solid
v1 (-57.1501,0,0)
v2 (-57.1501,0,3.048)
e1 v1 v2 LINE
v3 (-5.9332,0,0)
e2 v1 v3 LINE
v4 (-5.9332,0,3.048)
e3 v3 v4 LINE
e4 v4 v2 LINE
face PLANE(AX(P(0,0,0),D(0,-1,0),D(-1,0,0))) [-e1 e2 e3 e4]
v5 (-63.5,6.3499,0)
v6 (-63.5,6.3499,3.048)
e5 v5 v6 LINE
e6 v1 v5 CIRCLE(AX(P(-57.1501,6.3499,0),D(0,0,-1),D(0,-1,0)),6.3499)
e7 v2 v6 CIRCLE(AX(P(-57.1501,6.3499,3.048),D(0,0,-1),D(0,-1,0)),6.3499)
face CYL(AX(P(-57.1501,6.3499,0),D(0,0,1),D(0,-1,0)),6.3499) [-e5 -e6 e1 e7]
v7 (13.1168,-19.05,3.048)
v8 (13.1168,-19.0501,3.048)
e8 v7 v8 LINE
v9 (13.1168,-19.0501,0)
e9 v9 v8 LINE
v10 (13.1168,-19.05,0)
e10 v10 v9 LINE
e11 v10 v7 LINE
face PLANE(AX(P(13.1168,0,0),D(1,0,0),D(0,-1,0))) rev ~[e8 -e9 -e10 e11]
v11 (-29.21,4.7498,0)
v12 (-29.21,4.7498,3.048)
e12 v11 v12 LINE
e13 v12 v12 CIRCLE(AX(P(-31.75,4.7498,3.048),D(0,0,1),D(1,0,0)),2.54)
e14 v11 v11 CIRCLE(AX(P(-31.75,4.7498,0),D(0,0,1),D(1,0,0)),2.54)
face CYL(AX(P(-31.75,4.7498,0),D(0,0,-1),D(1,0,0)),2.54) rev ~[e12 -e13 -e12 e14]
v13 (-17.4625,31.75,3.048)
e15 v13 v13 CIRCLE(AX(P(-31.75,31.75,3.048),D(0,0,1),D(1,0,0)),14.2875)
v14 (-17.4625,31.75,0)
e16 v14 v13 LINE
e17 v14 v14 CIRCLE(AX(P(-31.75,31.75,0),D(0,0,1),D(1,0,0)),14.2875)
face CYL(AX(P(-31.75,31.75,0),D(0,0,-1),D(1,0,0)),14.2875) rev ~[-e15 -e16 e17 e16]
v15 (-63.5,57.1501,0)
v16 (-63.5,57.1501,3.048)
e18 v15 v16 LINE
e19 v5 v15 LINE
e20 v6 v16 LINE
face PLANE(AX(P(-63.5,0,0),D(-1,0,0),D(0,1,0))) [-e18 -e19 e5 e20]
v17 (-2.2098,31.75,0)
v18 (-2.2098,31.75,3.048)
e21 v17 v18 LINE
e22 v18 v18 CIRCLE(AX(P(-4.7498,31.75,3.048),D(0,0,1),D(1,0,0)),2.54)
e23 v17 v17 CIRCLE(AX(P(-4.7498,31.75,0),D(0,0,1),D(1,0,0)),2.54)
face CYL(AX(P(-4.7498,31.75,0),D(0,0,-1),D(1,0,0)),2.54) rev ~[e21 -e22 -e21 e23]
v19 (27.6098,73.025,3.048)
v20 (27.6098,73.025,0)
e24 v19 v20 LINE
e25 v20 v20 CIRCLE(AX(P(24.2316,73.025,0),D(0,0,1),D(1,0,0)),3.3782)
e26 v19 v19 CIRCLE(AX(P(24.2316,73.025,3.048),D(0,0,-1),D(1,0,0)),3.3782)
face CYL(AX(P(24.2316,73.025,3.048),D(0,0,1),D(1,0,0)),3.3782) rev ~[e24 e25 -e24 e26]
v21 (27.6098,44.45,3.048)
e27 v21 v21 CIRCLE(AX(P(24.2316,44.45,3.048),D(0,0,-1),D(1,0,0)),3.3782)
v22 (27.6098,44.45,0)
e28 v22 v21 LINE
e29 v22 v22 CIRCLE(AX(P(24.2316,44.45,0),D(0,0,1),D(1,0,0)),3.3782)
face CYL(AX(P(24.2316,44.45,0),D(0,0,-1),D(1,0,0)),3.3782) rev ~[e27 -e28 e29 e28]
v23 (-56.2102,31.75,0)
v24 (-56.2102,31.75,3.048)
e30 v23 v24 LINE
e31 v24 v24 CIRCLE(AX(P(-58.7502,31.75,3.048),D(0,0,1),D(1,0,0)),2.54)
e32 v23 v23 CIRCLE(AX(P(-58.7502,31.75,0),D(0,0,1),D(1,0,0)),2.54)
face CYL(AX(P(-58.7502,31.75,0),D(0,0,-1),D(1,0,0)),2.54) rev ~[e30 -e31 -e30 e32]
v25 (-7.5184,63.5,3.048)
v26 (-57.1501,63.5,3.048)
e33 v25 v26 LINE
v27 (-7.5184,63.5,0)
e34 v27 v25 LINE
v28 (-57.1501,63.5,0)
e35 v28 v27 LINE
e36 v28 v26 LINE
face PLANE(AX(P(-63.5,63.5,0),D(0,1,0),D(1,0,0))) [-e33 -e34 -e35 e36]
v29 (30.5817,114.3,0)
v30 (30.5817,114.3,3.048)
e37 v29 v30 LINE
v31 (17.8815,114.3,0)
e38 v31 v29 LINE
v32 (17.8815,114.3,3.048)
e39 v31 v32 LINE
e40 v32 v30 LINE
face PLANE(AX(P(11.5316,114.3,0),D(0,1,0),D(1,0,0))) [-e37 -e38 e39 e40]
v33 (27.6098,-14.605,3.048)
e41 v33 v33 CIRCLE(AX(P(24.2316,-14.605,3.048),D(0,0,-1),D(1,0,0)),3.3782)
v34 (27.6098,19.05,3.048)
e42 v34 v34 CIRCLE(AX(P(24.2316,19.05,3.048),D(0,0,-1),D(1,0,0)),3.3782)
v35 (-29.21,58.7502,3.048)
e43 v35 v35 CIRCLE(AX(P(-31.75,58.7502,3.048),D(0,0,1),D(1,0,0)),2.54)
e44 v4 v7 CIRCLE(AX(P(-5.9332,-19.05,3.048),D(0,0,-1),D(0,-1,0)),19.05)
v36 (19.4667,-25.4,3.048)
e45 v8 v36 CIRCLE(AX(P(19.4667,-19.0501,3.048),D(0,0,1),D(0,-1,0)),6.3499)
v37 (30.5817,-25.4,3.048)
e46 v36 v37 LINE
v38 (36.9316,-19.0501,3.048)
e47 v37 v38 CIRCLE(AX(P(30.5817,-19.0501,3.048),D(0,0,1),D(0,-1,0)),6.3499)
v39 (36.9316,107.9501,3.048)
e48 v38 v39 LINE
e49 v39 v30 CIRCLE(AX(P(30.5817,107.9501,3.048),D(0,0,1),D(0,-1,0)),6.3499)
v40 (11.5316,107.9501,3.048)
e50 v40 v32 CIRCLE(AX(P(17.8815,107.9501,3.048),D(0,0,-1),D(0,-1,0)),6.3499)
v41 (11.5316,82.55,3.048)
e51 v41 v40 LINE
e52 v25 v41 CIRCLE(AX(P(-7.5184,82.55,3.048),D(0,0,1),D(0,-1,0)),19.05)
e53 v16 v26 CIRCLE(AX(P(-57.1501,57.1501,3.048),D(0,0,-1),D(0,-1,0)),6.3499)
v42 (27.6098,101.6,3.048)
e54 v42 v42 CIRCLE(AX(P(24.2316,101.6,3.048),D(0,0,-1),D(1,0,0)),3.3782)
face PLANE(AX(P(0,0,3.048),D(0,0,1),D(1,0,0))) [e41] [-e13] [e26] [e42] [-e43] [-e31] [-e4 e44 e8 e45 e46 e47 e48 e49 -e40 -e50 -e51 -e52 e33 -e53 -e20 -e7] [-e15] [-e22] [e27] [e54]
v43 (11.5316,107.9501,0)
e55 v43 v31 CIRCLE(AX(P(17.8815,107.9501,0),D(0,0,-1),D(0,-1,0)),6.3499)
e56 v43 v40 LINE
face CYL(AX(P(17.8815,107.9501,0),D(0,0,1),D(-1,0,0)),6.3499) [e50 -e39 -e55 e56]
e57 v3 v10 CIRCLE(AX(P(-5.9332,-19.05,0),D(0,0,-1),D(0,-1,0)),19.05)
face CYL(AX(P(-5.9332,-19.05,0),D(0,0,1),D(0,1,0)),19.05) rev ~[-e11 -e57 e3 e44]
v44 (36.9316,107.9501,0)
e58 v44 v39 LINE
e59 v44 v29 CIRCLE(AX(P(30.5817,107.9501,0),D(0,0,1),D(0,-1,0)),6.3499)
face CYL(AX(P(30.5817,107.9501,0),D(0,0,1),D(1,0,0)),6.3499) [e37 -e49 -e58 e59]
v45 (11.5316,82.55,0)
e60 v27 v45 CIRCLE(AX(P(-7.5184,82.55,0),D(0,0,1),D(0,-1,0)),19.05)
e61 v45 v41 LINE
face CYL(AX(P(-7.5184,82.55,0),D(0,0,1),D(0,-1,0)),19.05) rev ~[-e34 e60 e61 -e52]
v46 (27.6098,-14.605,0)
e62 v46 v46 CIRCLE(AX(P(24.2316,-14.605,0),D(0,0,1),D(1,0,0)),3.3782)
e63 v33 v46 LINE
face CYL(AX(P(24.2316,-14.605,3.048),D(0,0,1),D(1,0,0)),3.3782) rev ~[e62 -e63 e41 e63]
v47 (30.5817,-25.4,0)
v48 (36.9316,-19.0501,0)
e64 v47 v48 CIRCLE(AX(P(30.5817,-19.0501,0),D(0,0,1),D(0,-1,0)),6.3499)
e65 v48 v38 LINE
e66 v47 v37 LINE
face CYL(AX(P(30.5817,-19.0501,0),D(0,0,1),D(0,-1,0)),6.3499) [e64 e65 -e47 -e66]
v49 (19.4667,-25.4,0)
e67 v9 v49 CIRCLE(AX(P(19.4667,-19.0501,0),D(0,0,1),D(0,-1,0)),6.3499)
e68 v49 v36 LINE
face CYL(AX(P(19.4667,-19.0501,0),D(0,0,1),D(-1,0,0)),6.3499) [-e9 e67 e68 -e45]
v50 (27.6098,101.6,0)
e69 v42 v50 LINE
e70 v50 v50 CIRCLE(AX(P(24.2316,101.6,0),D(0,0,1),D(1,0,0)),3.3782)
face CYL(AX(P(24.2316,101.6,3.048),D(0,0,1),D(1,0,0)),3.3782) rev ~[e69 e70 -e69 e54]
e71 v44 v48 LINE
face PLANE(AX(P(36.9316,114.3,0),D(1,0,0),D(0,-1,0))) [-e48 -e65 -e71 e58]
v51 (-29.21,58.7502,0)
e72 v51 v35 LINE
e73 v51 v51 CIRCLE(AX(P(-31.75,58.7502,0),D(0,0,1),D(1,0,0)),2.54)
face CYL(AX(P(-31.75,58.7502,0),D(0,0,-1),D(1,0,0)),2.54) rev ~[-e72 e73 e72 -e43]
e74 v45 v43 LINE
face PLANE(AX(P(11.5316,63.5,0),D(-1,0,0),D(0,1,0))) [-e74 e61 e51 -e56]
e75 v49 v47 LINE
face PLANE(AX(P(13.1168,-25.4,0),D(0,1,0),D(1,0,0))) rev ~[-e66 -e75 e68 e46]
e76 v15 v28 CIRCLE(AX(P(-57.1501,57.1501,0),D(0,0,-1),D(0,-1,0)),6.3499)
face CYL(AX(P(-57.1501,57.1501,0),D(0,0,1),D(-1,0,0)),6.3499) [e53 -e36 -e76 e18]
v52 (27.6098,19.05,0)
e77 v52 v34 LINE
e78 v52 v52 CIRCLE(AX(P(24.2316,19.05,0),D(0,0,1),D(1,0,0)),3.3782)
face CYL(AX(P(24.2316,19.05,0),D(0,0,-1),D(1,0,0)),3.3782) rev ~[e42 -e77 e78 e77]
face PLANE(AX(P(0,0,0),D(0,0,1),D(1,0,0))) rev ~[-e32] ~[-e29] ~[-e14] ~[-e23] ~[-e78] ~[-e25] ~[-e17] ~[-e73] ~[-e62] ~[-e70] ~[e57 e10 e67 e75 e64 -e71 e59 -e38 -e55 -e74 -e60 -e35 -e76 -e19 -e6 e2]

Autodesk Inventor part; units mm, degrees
ref_plane "YZ Plane" through (0, 0, 0) normal (1, 0, 0) x (0, 1, 0)
ref_plane "XZ Plane" through (0, 0, 0) normal (0, 1, 0) x (-1, 0, 0)
ref_plane "XY Plane" through (0, 0, 0) normal (0, 0, 1) x (1, 0, 0)
sketch "Sketch1" plane through (0, 0, 0) normal (0, 0, 1) x (1, 0, 0)
  line L0 (0, 0) -> (-63.5, 0)
  line L1 (-63.5, 0) -> (-63.5, 63.5)
  line L2 (-63.5, 63.5) -> (0, 63.5)
  circle A0 centre (-58.7502, 31.75) radius 2.54
  circle A1 centre (-31.75, 58.7502) radius 2.54
  circle A2 centre (-4.7498, 31.75) radius 2.54
  circle A3 centre (-31.75, 4.7498) radius 2.54
  line L3 (36.9316, 63.5) -> (36.9316, 0)
  line L4 (13.1168, 0) -> (0, 0)
  circle A4 centre (-31.75, 31.75) radius 14.2875
  line L5 (24.2316, 63.5) -> (24.2316, 44.45)
  line L6 (24.2316, 44.45) -> (24.2316, 19.05)
  circle A5 centre (24.2316, 44.45) radius 3.3782
  circle A6 centre (24.2316, 19.05) radius 3.3782
  line L7 (20.8534, 44.45) -> (20.8534, 19.05)
  line L8 (27.6098, 19.05) -> (27.6098, 44.45)
  line L9 (11.5316, 63.5) -> (11.5316, 114.3)
  line L10 (13.1168, 0) -> (13.1168, -25.4)
  line L11 (13.1168, -25.4) -> (36.9316, -25.4)
  line L12 (36.9316, -25.4) -> (36.9316, 0)
  line L13 (11.5316, 114.3) -> (36.9316, 114.3)
  line L14 (36.9316, 114.3) -> (36.9316, 63.5)
  line L15 (0, 63.5) -> (11.5316, 63.5)
  dimension "d0" = 63.5
  dimension "d1" = 63.5
  dimension "d6" = 5.08
  dimension "d7" = 5.08
  dimension "d8" = 5.08
  dimension "d9" = 5.08
  dimension "d11" = 36.9316
  dimension "d12" = 28.575
  dimension "d13" = 12.7
  dimension "d15" = 25.4
  dimension "d16" = 6.7564
  dimension "d17" = 6.7564
  dimension "d23" = 50.8
  dimension "d24" = 25.4
extrude "Plate2" add sketch "Sketch1" along normal blind 3.048 contours L0 L1 L2 L15 L9 L13 L14 L3 L12 L11 L10 L4 | L8 A6 L6 A5 | A5 L6 A6 L7
sketch "Sketch4" plane through (0, 0, 3.048) normal (0, 0, 1) x (1, 0, 0)
  circle A0 centre (24.2316, 19.05) radius 3.3782 projected
  circle A1 centre (24.2316, 44.45) radius 3.3782 projected
  line L0 (-63.5, 63.5) -> (11.5316, 63.5) projected
  line L1 (24.2316, 44.45) -> (24.2316, 101.6)
  circle A2 centre (24.2316, 101.6) radius 3.3782
  circle A3 centre (24.2316, 73.025) radius 3.3782
  line L2 (24.2316, 19.05) -> (24.2316, -14.605)
  circle A4 centre (24.2316, -14.605) radius 3.3782
  point P0 (0, 0)
  point P1 (20.8534, 44.45)
  point P2 (20.8534, 19.05)
  point P3 (27.6098, 19.05)
  point P4 (27.6098, 44.45)
  dimension "d25" = 57.15
  dimension "d26" = 6.7564
  dimension "d27" = 6.7564
  dimension "d28" = 33.655
  dimension "d29" = 6.7564
extrude "Cut1" cut sketch "Sketch4" against normal blind 3.048
fillet "Corner Round1" radius 19.05 2 edges at (11.5316, 63.5, 1.524) (13.1168, 0, 1.524)
fillet "Corner Round2" radius 6.35 6 edges at (-63.5, 63.5, 1.524) (-63.5, 0, 1.524) (13.1168, -25.4, 1.524) (36.9316, -25.4, 1.524) (36.9316, 114.3, 1.524) (11.5316, 114.3, 1.524)
equation "\"d19\" = Thickness"
equation "\"BendRadius\" = Thickness"
equation "\"BendReliefWidth\" = Thickness"
equation "\"BendReliefDepth\" = 0.5 * Thickness"
equation "\"CornerReliefSize\" = 4 * Thickness"
equation "\"MinimumRemnant\" = 2 * Thickness"
equation "\"TransitionRadius\" = BendRadius"
equation "\"JacobiRadiusSize\" = BendRadius"
equation "\"GapSize\" = Thickness"
equation "\"d10\" = BendRadius"
equation "\"d18\" = BendRadius"
equation "\"Thickness\" = 3.048"
properties part number "M - p80 mount plate" material "Aluminum 6061"
